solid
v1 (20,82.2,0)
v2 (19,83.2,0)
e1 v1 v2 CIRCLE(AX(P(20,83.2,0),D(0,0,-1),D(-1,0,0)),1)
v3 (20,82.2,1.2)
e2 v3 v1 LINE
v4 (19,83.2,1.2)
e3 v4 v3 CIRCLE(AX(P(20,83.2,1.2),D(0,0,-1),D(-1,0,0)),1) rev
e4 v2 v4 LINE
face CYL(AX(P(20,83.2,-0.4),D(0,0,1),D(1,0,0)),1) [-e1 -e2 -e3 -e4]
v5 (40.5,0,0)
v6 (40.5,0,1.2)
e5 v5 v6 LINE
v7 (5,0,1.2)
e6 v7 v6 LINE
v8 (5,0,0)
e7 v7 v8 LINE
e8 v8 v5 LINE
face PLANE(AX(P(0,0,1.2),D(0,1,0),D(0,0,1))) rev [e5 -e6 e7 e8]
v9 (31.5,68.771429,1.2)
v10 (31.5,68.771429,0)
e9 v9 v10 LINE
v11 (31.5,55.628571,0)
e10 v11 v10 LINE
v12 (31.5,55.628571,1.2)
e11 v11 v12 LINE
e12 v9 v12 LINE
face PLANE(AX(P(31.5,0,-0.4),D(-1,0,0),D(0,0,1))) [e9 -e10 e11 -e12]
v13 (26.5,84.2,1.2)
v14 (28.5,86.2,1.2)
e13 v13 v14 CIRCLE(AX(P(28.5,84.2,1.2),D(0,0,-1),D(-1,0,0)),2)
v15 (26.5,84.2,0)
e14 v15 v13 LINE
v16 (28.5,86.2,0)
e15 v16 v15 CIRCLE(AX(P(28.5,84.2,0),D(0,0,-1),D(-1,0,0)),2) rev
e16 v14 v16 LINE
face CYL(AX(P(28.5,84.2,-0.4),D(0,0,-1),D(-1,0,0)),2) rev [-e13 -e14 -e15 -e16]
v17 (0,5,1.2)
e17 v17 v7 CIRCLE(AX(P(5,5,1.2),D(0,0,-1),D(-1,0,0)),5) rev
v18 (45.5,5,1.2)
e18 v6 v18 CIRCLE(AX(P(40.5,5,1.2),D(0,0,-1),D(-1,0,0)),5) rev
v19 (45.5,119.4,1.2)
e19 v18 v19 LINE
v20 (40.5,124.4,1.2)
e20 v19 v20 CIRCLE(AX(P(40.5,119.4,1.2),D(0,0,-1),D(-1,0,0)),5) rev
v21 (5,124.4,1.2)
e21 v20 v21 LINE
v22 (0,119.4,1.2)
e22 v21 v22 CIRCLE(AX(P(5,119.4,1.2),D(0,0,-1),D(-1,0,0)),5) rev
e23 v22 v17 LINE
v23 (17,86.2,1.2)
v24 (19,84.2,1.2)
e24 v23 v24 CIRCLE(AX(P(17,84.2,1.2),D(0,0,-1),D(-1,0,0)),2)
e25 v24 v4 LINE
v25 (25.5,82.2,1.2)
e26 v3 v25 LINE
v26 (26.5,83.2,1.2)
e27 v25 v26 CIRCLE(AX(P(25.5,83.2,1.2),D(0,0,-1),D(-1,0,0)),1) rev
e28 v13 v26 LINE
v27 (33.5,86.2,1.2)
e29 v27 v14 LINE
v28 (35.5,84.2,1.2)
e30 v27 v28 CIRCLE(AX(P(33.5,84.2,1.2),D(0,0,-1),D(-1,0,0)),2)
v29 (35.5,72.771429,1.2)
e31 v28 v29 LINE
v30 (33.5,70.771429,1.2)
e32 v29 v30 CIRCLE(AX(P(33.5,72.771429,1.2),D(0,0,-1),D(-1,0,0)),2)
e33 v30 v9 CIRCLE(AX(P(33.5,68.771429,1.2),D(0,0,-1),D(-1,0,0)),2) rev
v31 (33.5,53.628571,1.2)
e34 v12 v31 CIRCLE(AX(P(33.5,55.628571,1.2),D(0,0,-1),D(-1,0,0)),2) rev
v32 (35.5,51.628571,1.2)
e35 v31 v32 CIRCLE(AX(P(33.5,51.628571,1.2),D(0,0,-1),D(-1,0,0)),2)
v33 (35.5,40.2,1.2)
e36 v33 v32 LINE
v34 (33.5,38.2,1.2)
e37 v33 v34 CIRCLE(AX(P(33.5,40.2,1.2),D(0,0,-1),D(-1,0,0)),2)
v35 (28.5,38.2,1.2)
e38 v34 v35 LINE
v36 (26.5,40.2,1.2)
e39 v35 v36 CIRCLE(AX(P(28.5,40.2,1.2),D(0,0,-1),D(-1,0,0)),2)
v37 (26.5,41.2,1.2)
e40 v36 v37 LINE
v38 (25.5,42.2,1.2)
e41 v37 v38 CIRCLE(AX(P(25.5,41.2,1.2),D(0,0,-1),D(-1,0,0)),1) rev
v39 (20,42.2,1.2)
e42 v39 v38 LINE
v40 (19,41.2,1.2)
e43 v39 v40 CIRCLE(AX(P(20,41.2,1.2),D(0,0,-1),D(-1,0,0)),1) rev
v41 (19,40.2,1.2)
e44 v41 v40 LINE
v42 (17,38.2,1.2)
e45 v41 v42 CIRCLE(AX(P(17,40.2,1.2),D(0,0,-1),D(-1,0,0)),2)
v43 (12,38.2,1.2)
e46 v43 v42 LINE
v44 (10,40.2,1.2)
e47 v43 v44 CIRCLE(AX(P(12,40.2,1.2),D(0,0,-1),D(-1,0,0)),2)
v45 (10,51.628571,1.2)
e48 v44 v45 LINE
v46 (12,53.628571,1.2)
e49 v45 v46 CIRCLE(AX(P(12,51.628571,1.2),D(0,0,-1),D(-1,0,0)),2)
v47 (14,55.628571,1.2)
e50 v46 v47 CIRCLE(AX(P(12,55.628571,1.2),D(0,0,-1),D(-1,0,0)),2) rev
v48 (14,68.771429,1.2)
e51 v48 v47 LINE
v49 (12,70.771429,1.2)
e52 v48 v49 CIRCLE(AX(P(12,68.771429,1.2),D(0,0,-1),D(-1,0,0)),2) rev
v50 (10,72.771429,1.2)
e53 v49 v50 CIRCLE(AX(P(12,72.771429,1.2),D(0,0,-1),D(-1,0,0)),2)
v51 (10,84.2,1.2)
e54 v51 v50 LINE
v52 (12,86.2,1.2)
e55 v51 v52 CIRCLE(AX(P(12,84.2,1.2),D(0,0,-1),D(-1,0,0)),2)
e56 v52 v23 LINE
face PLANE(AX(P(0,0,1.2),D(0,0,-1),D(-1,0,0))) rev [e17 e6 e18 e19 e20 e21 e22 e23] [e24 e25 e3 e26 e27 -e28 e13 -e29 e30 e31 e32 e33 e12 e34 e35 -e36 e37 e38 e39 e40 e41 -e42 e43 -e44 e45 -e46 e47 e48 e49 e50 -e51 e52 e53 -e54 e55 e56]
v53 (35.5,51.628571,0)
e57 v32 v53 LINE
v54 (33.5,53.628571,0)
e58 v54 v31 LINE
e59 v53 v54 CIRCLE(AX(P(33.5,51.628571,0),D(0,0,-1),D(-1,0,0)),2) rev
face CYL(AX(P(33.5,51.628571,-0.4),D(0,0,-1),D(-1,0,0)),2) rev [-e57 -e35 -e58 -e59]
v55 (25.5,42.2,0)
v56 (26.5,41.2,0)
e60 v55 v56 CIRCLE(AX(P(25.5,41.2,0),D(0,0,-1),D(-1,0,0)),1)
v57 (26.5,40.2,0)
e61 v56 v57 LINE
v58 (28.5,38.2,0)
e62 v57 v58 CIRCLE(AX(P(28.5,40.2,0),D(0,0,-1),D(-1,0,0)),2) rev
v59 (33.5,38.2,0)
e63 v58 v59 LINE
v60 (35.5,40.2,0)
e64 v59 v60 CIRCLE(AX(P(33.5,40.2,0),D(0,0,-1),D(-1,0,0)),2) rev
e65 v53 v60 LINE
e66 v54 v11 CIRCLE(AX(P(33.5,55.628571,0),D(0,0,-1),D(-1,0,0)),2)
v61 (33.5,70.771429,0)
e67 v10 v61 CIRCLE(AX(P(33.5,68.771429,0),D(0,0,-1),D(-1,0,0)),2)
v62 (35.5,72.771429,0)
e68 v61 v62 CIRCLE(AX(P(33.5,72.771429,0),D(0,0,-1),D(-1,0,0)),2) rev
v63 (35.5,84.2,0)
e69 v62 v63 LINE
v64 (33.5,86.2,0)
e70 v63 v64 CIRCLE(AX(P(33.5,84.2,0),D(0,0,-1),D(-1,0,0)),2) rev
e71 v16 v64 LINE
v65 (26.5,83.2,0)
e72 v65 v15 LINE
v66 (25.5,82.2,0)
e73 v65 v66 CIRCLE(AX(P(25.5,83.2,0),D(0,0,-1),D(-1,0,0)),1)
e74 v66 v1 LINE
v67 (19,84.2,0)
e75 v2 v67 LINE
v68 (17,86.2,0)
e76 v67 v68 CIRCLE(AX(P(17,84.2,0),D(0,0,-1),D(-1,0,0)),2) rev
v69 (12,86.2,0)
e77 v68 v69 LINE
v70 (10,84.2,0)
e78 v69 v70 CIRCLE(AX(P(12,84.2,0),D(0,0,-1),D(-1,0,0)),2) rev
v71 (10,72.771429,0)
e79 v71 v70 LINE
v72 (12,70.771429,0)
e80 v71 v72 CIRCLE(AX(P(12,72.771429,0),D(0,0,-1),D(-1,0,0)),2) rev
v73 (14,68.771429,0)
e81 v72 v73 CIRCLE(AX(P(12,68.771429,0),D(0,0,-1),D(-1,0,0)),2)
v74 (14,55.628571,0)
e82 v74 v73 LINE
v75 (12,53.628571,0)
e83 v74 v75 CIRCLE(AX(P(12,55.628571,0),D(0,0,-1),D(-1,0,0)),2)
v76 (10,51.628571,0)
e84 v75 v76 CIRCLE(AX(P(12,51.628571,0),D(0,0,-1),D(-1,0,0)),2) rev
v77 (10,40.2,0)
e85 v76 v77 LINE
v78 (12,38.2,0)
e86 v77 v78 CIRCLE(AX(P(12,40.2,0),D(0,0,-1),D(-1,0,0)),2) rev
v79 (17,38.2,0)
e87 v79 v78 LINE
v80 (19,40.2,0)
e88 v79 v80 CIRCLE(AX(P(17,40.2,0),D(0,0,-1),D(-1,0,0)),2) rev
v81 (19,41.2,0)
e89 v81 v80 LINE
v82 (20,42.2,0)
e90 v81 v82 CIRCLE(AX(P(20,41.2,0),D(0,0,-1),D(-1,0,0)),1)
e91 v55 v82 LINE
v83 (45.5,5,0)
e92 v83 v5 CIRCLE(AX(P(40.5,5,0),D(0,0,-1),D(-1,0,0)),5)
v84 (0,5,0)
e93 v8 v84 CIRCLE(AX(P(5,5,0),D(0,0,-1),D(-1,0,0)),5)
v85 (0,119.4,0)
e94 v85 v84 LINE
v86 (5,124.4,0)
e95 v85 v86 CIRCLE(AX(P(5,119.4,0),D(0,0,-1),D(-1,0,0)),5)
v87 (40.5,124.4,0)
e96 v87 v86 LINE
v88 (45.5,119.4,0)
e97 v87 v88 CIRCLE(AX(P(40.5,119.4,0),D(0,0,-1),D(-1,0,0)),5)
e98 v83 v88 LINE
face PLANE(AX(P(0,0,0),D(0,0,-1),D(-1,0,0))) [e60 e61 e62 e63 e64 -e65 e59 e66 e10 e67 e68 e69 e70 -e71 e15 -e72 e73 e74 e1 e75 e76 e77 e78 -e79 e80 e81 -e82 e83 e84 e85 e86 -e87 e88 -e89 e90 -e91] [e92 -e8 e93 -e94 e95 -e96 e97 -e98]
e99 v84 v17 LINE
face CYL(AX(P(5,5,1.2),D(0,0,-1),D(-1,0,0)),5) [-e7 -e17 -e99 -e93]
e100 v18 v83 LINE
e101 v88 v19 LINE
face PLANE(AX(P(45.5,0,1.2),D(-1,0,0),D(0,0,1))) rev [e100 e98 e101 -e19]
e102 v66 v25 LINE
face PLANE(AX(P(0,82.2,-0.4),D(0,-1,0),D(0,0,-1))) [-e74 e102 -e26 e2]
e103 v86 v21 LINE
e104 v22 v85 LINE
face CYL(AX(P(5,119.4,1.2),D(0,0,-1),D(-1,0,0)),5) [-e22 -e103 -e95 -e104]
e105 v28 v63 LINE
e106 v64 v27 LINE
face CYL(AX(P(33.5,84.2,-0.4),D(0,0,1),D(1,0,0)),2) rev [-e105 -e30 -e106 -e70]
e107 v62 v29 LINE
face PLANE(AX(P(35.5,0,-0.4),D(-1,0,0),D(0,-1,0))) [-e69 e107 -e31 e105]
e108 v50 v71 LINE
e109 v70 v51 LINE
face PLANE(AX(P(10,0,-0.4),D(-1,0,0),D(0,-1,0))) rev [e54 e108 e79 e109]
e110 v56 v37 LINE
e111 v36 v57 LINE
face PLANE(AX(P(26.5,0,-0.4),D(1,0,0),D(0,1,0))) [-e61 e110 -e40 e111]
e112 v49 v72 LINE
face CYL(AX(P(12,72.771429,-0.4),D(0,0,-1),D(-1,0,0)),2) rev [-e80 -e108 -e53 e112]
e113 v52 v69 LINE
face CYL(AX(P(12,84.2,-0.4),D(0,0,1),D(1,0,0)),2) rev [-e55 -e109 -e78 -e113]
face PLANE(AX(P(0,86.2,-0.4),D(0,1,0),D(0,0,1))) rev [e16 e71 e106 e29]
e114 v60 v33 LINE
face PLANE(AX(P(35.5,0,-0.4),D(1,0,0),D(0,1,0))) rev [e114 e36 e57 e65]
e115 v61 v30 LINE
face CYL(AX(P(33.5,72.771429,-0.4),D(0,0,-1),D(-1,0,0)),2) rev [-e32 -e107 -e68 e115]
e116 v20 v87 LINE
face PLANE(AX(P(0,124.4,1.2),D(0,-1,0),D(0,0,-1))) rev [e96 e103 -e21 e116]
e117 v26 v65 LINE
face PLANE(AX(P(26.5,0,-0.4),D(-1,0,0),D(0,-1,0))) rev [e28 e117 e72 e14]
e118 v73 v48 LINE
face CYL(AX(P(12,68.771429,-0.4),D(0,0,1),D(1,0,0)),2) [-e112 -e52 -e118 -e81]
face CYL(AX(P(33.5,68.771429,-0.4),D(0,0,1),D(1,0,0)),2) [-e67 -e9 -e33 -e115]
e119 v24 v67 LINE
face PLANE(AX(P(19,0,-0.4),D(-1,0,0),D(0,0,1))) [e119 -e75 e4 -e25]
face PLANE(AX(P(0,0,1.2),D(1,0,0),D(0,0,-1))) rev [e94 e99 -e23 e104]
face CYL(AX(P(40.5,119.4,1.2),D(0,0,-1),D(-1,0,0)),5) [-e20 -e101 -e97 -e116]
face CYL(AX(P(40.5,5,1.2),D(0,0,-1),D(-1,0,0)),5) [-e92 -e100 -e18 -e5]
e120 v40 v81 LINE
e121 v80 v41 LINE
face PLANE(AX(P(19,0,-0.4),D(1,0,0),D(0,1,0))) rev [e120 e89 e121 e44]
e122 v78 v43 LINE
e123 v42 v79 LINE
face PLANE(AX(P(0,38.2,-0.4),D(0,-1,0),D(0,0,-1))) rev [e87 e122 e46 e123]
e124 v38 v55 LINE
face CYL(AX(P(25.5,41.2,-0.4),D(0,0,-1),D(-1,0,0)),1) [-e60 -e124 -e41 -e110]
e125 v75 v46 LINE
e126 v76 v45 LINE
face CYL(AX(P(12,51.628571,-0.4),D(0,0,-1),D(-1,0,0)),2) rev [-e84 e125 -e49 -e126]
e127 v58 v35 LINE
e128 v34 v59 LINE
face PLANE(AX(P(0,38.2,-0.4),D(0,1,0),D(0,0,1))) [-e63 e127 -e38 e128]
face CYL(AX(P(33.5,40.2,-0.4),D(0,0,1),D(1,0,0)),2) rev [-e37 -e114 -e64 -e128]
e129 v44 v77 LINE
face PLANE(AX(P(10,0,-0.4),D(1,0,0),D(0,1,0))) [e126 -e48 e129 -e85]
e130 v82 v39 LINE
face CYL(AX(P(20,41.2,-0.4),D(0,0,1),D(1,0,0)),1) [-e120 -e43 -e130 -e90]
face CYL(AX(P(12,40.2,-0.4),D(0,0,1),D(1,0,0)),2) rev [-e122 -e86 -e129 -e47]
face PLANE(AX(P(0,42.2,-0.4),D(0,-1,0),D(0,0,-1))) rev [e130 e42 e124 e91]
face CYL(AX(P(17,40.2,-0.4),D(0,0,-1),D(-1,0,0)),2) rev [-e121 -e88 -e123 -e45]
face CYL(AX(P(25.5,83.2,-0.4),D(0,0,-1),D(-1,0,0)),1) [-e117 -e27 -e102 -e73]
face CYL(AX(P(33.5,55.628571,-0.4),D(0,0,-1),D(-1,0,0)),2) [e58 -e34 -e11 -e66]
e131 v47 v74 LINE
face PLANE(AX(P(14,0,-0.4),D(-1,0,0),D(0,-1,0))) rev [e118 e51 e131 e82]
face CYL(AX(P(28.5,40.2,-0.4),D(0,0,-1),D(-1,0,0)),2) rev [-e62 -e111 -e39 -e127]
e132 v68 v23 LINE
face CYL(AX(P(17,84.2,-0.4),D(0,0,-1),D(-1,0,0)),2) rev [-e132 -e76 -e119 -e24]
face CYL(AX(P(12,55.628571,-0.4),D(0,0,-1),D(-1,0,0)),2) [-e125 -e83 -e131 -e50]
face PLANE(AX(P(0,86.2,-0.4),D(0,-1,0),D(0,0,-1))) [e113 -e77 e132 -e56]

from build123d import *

# Parameters (mm, degrees)
SKETCH1_W           = 45.5
SKETCH1_H           = 124.4
BOSS_EXTRUDE1_DEPTH = 1.2
SKETCH2_W           = 5
SKETCH2_H           = 11.428571429
CUT_EXTRUDE1_DEPTH  = 1.6
FILLET1_R           = 2
FILLET2_R           = 1
FILLET3_R           = 5


with BuildPart() as part:
    # Sketch1 → Boss-Extrude1 (new body)
    with BuildSketch(Plane.XY):
        with Locations((22.75, 62.2)):
            Rectangle(SKETCH1_W, SKETCH1_H)
    extrude(amount=BOSS_EXTRUDE1_DEPTH)

    # Sketch2 → Cut-Extrude1 (cut)
    with BuildSketch(Plane.XY.offset(1.2)):
        Polygon((14, 82.2), (19, 82.2), (19, 86.2), (10, 86.2), (10, 70.771428571), (14, 70.771428571), align=None)
        with Locations((16.5, 76.485714285)):
            Rectangle(SKETCH2_W, SKETCH2_H)
        Polygon((26.5, 70.771428571), (26.5, 82.2), (19, 82.2), (19, 70.771428571), (14, 70.771428571), (14, 53.628571429), (19, 53.628571429), (19, 42.2), (26.5, 42.2), (26.5, 53.628571429), (31.5, 53.628571429), (31.5, 70.771428571), align=None)
        with Locations((29, 76.485714285)):
            Rectangle(SKETCH2_W, SKETCH2_H)
        Polygon((35.5, 70.771428571), (35.5, 86.2), (26.5, 86.2), (26.5, 82.2), (31.5, 82.2), (31.5, 70.771428571), align=None)
        Polygon((35.5, 53.628571429), (31.5, 53.628571429), (31.5, 42.2), (26.5, 42.2), (26.5, 38.2), (35.5, 38.2), align=None)
        with Locations((29, 47.914285715)):
            Rectangle(SKETCH2_W, SKETCH2_H)
        Polygon((14, 42.2), (14, 53.628571429), (10, 53.628571429), (10, 38.2), (19, 38.2), (19, 42.2), align=None)
        with Locations((16.5, 47.914285715)):
            Rectangle(SKETCH2_W, SKETCH2_H)
    extrude(amount=-CUT_EXTRUDE1_DEPTH, mode=Mode.SUBTRACT)

    # Fillet1
    fillet1_edges = [part.edges().sort_by_distance(p)[0] for p in [
        (10, 70.771428571, 0.6),
        (19, 86.2, 0.6),
        (26.5, 86.2, 0.6),
        (35.5, 86.2, 0.6),
        (35.5, 70.771428571, 0.6),
        (31.5, 70.771428571, 0.6),
        (31.5, 53.628571429, 0.6),
        (35.5, 53.628571429, 0.6),
        (35.5, 38.2, 0.6),
        (26.5, 38.2, 0.6),
        (19, 38.2, 0.6),
        (10, 38.2, 0.6),
        (10, 53.628571429, 0.6),
        (14, 53.628571429, 0.6),
        (14, 70.771428571, 0.6),
        (10, 86.2, 0.6),
    ]]
    fillet(fillet1_edges, radius=FILLET1_R - 0.0001)  # a hair under: the kernel refuses the full size

    # Fillet2
    fillet2_edges = [part.edges().sort_by_distance(p)[0] for p in [
        (19, 42.2, 0.6),
        (19, 82.2, 0.6),
        (26.5, 82.2, 0.6),
        (26.5, 42.2, 0.6),
    ]]
    fillet(fillet2_edges, radius=FILLET2_R)

    # Fillet3
    fillet3_edges = [part.edges().sort_by_distance(p)[0] for p in [
        (0, 124.4, 0.6),
        (45.5, 124.4, 0.6),
        (45.5, 0, 0.6),
        (0, 0, 0.6),
    ]]
    fillet(fillet3_edges, radius=FILLET3_R)


solid = part.part
